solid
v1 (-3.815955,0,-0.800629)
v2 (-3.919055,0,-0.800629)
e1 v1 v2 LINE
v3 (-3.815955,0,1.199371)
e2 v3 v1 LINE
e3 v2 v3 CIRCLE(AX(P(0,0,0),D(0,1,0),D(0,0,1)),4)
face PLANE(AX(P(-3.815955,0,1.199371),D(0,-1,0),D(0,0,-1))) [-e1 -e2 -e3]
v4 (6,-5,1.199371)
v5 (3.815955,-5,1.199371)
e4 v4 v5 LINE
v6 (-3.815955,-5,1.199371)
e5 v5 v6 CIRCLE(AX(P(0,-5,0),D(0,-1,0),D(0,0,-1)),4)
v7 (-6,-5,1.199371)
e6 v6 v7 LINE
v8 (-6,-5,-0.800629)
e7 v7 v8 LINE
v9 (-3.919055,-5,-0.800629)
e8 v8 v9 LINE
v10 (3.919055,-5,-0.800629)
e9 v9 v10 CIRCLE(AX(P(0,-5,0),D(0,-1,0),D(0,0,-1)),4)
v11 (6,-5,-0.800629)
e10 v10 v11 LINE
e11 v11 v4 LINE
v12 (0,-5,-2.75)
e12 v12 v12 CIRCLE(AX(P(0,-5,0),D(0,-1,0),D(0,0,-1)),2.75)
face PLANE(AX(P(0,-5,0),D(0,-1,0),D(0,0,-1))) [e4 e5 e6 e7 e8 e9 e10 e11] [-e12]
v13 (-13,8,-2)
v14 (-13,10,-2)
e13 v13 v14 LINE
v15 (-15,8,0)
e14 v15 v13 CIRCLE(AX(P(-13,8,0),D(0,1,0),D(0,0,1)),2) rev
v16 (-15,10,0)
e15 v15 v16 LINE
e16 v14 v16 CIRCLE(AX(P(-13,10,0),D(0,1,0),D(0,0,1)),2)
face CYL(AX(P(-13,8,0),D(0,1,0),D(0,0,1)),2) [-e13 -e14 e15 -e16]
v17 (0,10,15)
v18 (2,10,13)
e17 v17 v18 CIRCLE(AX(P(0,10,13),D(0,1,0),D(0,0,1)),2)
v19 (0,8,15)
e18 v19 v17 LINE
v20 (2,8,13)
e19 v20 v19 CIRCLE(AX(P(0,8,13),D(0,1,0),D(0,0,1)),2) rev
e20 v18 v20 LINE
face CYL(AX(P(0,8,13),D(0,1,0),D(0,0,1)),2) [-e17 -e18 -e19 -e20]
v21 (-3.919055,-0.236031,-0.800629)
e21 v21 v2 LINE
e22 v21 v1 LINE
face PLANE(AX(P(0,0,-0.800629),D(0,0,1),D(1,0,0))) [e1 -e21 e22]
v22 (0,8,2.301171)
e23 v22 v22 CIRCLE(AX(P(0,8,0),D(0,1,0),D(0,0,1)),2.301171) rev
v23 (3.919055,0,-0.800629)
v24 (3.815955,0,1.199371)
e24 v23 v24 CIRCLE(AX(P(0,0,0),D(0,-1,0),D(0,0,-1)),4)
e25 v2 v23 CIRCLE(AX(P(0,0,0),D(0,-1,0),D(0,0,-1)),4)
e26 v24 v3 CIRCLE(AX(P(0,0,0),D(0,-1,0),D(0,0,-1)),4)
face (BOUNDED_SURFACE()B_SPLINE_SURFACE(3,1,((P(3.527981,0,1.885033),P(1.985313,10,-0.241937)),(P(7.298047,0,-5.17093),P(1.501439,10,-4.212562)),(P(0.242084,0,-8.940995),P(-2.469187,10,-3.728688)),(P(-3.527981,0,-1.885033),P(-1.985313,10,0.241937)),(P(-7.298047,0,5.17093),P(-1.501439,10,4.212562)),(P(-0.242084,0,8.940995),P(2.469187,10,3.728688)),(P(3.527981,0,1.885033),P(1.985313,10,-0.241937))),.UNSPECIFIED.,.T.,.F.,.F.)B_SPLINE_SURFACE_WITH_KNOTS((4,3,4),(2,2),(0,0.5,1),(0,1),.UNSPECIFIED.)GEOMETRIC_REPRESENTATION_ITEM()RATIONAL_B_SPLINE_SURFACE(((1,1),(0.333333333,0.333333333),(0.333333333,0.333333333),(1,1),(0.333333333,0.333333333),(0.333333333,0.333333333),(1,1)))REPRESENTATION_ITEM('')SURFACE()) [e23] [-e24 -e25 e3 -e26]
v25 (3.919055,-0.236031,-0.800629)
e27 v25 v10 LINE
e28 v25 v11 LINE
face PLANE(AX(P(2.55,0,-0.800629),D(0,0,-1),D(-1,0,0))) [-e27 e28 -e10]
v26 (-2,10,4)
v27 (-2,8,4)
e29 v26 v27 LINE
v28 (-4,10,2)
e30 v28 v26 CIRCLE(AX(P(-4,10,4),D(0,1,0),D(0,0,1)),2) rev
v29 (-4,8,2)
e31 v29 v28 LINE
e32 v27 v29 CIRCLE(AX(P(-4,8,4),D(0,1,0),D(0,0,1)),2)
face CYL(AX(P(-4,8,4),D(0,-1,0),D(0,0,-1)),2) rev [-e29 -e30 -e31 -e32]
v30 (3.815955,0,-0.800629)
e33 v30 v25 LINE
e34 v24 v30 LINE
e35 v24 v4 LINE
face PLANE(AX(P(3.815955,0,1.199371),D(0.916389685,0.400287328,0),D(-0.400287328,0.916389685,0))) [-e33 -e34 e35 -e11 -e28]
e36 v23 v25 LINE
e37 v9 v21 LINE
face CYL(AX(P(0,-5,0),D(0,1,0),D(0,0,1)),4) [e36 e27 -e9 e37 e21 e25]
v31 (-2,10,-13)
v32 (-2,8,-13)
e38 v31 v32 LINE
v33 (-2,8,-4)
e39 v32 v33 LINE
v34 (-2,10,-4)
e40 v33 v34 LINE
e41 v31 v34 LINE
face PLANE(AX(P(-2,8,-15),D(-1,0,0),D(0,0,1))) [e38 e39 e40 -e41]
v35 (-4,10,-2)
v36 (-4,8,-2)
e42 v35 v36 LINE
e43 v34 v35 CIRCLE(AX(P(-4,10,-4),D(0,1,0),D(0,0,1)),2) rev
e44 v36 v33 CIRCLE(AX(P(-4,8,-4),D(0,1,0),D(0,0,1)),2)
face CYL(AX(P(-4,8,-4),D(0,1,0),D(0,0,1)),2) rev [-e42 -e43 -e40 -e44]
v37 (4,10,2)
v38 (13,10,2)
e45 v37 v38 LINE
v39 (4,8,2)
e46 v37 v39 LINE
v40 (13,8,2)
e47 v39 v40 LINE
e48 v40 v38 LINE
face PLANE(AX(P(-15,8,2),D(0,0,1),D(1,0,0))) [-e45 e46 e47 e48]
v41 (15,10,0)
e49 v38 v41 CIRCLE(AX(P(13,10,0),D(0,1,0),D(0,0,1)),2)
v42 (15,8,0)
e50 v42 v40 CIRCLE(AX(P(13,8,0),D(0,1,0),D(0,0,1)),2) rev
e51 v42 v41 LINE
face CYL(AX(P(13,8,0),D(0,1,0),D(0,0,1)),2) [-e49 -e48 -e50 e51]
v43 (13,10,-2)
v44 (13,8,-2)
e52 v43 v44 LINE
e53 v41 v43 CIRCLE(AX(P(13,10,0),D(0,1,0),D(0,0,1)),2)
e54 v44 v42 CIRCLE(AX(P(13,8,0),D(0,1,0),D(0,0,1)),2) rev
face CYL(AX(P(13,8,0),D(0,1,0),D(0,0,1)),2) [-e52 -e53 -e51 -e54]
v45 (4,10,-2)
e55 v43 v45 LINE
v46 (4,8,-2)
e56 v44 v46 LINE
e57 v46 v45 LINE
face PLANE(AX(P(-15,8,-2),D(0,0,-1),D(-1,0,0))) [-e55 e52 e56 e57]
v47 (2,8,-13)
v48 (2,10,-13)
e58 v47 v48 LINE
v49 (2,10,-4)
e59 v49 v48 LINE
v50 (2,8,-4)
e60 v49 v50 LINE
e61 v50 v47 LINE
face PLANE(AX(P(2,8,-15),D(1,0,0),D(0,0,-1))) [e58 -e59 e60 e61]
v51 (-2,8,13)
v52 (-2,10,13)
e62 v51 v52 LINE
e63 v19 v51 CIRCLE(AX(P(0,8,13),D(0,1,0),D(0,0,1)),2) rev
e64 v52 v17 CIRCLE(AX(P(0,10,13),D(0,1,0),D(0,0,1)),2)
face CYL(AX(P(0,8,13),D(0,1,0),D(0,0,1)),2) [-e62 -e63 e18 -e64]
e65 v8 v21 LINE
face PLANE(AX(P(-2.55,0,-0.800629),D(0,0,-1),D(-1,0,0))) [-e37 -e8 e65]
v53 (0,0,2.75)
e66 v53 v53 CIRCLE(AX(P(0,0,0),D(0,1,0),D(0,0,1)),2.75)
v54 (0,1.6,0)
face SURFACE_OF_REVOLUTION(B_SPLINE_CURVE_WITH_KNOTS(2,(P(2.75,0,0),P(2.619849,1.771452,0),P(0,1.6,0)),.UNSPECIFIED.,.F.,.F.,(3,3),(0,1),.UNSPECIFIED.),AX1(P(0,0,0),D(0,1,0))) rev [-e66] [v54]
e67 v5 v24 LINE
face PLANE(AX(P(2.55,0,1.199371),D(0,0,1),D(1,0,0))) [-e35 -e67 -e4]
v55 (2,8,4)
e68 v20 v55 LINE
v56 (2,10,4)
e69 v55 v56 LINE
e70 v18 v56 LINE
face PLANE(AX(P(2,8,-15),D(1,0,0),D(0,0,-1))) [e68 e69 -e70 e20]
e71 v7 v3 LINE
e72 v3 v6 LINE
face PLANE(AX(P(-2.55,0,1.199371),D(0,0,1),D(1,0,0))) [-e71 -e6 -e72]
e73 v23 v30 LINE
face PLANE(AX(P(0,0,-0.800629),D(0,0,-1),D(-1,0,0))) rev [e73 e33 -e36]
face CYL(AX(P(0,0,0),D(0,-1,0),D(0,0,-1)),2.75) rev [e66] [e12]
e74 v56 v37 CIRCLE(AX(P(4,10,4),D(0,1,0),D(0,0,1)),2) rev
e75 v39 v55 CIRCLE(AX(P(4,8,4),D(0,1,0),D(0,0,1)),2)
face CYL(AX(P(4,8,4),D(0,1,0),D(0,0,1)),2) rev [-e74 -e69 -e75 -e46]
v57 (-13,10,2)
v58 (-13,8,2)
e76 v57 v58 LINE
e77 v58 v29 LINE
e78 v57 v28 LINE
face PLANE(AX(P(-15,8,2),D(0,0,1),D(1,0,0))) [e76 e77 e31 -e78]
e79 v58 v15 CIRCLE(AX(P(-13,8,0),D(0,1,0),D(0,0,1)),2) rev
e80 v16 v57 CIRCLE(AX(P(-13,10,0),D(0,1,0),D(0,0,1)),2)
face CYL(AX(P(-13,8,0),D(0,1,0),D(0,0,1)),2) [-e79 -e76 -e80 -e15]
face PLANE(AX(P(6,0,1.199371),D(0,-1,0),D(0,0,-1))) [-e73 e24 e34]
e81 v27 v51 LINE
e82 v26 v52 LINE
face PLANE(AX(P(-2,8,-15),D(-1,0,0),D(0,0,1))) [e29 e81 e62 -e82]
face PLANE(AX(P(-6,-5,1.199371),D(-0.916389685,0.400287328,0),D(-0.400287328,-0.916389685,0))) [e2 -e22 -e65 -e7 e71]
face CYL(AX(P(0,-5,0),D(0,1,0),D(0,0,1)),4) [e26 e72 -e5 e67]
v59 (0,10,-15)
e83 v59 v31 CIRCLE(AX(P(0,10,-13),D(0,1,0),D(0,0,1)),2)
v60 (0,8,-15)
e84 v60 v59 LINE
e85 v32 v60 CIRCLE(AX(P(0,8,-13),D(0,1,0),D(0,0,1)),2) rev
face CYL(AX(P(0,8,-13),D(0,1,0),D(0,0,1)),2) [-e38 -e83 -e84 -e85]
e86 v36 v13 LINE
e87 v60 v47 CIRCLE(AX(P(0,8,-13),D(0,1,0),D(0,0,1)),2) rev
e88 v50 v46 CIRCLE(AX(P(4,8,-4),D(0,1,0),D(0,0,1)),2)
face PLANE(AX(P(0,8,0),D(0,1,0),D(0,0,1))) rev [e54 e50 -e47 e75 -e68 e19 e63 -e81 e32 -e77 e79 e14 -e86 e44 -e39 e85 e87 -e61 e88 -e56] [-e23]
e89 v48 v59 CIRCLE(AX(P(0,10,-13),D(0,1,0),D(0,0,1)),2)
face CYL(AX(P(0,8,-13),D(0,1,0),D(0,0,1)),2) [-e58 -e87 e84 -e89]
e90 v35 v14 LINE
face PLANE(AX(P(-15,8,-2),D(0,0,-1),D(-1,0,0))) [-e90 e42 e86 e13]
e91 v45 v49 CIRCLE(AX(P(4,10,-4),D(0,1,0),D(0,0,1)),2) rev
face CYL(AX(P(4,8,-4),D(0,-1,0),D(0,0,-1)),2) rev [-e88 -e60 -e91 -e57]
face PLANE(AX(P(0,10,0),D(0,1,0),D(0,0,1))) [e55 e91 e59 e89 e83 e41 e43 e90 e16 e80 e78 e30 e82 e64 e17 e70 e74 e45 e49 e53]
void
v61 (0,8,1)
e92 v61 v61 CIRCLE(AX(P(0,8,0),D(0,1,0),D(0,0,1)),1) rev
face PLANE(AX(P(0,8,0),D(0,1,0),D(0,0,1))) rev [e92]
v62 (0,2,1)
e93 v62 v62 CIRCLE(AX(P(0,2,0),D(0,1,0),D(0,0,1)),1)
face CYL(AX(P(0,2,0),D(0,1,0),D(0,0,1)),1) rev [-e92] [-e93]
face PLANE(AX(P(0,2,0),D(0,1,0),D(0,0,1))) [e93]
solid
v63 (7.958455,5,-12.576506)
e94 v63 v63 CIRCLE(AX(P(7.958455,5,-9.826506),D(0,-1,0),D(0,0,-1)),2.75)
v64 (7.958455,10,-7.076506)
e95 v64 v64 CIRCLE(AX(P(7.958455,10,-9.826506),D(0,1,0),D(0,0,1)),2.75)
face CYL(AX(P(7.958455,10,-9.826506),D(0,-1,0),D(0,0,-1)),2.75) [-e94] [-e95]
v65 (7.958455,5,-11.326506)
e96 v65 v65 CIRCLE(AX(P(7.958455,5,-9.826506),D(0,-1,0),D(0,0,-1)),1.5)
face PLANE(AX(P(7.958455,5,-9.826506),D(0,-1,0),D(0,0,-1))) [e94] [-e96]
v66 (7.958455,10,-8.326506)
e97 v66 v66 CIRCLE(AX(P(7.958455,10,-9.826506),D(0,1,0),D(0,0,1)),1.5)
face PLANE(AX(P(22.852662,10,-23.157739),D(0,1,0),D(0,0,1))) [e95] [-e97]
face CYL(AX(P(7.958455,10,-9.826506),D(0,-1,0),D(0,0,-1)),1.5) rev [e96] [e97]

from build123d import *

# Parameters (mm, degrees)
SKETCH_1_R          = 2
EXTRUDE_2_DEPTH     = 10
SKETCH_4_R          = 1
CUT_EXTRUDE_1_DEPTH = 1.5
SKETCH_5_R          = 2.5500000000000007
CUT_EXTRUDE_2_DEPTH = 1.5
OTHER_4_OUTLINE_R   = 2.55
OTHER_4_DEPTH       = 1.5
SKETCH_9_R          = 4
SKETCH_9_R_2        = 2.5500000000000003
EXTRUDE_3_DEPTH     = 5
SKETCH_11_W         = 3.45
SKETCH_11_H         = 2
EXTRUDE_4_DEPTH     = 5
SKETCH_13_R         = 2.5499999999999994
SKETCH_13_R_2       = 1.3600000000000005
EXTRUDE_6_DEPTH     = 5
SKETCH_14_R         = 2.75
CUT_EXTRUDE_3_DEPTH = 5
SKETCH_17_R         = 1
CUT_EXTRUDE_4_DEPTH = 8
SKETCH_18_R         = 1.5000000000000004
CUT_EXTRUDE_5_DEPTH = 8
SKETCH_19_R         = 2.7499999999999982
SKETCH_19_R_2       = 2.549999999999999
EXTRUDE_7_DEPTH     = 5
SWEEP_4_DEPTH       = 1.199370755
EXTRUDE_8_DEPTH     = 2
SKETCH_26_W         = 30
SKETCH_26_H         = 4
EXTRUDE_9_DEPTH     = 2
FILLET_3_R          = 2
FILLET_4_R          = 2
SKETCH_28_R         = 2.7499999999999982
SKETCH_28_R_2       = 1.5000000000000002
EXTRUDE_10_DEPTH    = 10
SKETCH_29_R         = 2.749999999999998
SKETCH_29_R_2       = 1.5000000000000002
CUT_EXTRUDE_6_DEPTH = 5
SKETCH_30_R         = 3.4440131177468327
CUT_EXTRUDE_7_DEPTH = 5
FILLET_5_R          = 2
SKETCH_31_R         = 32.078168180335766
EXTRUDE_11_DEPTH    = 5
CUT_EXTRUDE_START   = -5
SKETCH_32_R         = 32.078168180335766
CUT_EXTRUDE_8_DEPTH = 5


with BuildPart() as part:
    # 草图1 → 凸台-拉伸2 (new body)
    with BuildSketch(Plane(origin=(0, 0, 0), x_dir=(1, 0, 0), z_dir=(0, 1, 0))):
        with Locations(Location((0, 0, 0), (0, 0, 270))):
            Circle(SKETCH_1_R)
    extrude(amount=EXTRUDE_2_DEPTH)

    # 放样1: read off the stored shape, not the designer's step
    # 放样1: loft between two sections, ruled curve by curve
    loft_1_from = [
        Edge.make_bspline([(3.527981201, 0, 1.885032797), (7.298046794, 0, -5.170929606), (0.242084392, 0, -8.940995199), (-3.527981201, 0, -1.885032797), (-7.298046794, 0, 5.170929606), (-0.242084392, 0, 8.940995199), (3.527981201, 0, 1.885032797)], [0, 0, 0, 0, 0.5, 0.5, 0.5, 1, 1, 1, 1], 3, [1, 0.333333333333333, 0.333333333333333, 1, 0.333333333333333, 0.333333333333333, 1]),
    ]
    loft_1_to = [
        Edge.make_bspline([(1.985312696, 10, -0.241936974), (1.501438748, 10, -4.212562366), (-2.469186644, 10, -3.728688418), (-1.985312696, 10, 0.241936974), (-1.501438748, 10, 4.212562366), (2.469186644, 10, 3.728688418), (1.985312696, 10, -0.241936974)], [0, 0, 0, 0, 0.5, 0.5, 0.5, 1, 1, 1, 1], 3, [1, 0.333333333333333, 0.333333333333333, 1, 0.333333333333333, 0.333333333333333, 1]),
    ]
    loft_1 = Solid(Shell([*[Face.make_surface_from_curves(loft_1_from[k], loft_1_to[k]) for k in range(1)], Face(Wire(loft_1_from)), Face(Wire(loft_1_to))]))
    add(loft_1)

    # 草图4 → 切除-拉伸1 (cut)
    with BuildSketch(Plane.XZ):
        with Locations(Location((0, 0, 0), (0, 0, 270))):
            Circle(SKETCH_4_R)
    extrude(amount=-CUT_EXTRUDE_1_DEPTH, mode=Mode.SUBTRACT)

    # 草图5 → 切除-拉伸2 (cut)
    with BuildSketch(Plane.XZ):
        with Locations(Location((0, 0, 0), (0, 0, 270))):
            Circle(SKETCH_5_R)
    extrude(amount=-CUT_EXTRUDE_2_DEPTH, mode=Mode.SUBTRACT)

    # 边界4: read off the stored shape, not the designer's step
    # 边界4 outline → 边界4 (add)
    with BuildSketch(Plane(origin=(0, 0, 0), x_dir=(1, 0, 0), z_dir=(0, 1, 0))):
        Circle(OTHER_4_OUTLINE_R)
    extrude(amount=OTHER_4_DEPTH)

    # 切除-扫描1: sweep along a path in 草图7
    with BuildLine(Plane.XZ) as sweep_1_path:
        CenterArc((0, 0), 2.5500000000000003, 0, 360)
    # 草图8 → 切除-扫描1 (sweep, cut)
    with BuildSketch(Plane.XY):
        with BuildLine():
            Line((0, 1.5), (0, 0))
            Line((0, 0), (2.55, 0))
            add(Edge.make_bspline(
                [(2.55, 0), (2.066182344596684, 1.6092270378331606), (0, 1.5)],
                knots=[0, 0, 0, 1, 1, 1], degree=2))
        make_face()
    sweep(path=sweep_1_path.line, mode=Mode.SUBTRACT)

    # 草图9 → 凸台-拉伸3 (add)
    with BuildSketch(Plane.XZ):
        with Locations(Location((0, 0, 0), (0, 0, 28.116))):
            Circle(SKETCH_9_R)
        with Locations(Location((0, 0, 0), (0, 0, 90))):
            Circle(SKETCH_9_R_2, mode=Mode.SUBTRACT)
    extrude(amount=EXTRUDE_3_DEPTH)

    # 草图11 → 凸台-拉伸4 (add)
    with BuildSketch(Plane.XZ.offset(5)):
        Polygon((2.55, 1.199370755069412), (2.5500000000000003, -0.8006292449305884), (6, -0.8006292449305882), (6, 1.199370755069412), align=None)
        with Locations((-4.275, 0.19937075506941165)):
            Rectangle(SKETCH_11_W, SKETCH_11_H)
    extrude(amount=-EXTRUDE_4_DEPTH)

    # 草图14 → 切除-拉伸3 (cut)
    with BuildSketch(Plane.XZ.offset(5)):
        with Locations(Location((0, 0, 0), (0, 0, 270))):
            Circle(SKETCH_14_R)
    extrude(amount=-CUT_EXTRUDE_3_DEPTH, mode=Mode.SUBTRACT)

    # 切除-扫描2: sweep along a path in 草图16
    with BuildLine(Plane.XZ) as sweep_2_path:
        CenterArc((0, 0), 2.75, 0, 360)
    # 草图15 → 切除-扫描2 (sweep, cut)
    with BuildSketch(Plane.XY):
        with BuildLine():
            Line((0, 0), (2.75, 0))
            add(Edge.make_bspline(
                [(2.75, 0), (2.6198492058143814, 1.7714522282796645), (0, 1.6)],
                knots=[0, 0, 0, 1, 1, 1], degree=2))
            Line((0, 1.6), (0, 0))
        make_face()
    sweep(path=sweep_2_path.line, mode=Mode.SUBTRACT)

    # 草图17 → 切除-拉伸4 (cut)
    with BuildSketch(Plane(origin=(0, 10, 0), x_dir=(1, 0, 0), z_dir=(0, 1, 0))):
        with Locations(Location((0, 0, 0), (0, 0, 270))):
            Circle(SKETCH_17_R)
    extrude(amount=-CUT_EXTRUDE_4_DEPTH, mode=Mode.SUBTRACT)

    # 切除-扫描4: read off the stored shape, not the designer's step
    # 切除-扫描4 outline → 切除-扫描4 (cut)
    with BuildSketch(Plane.XY):
        Polygon((6, 0), (3.815954637, 0), (6, -5), align=None)
        Polygon((-3.815954637, 0), (-6, 0), (-6, -5), align=None)
    extrude(amount=SWEEP_4_DEPTH, mode=Mode.SUBTRACT)

    # 切除-扫描5: sweep along a path in 草图24
    with BuildLine(Plane(origin=(6, 0, 0), x_dir=(0, 0, -1), z_dir=(1, 0, 0))) as sweep_5_path:
        Line((0, -5), (0.8006292449305882, -5))
    # 草图23 → 切除-扫描5 (sweep, cut)
    with BuildSketch(Plane.XY):
        Polygon((3.8159546370317634, 0), (6, 0), (6, -5), align=None)
        Polygon((-3.8159546370317634, 0), (-6, -5), (-6, 0), align=None)
    sweep(path=sweep_5_path.line, mode=Mode.SUBTRACT)

    # 草图25 → 凸台-拉伸8 (add)
    with BuildSketch(Plane(origin=(0, 10, 0), x_dir=(1, 0, 0), z_dir=(0, 1, 0))):
        Polygon((-2.0000000000000027, 15.000000000000004), (1.9999999999999973, 15.000000000000004), (2.000000000000001, -14.999999999999996), (-1.9999999999999991, -14.999999999999996), align=None)
    extrude(amount=-EXTRUDE_8_DEPTH)

    # 草图26 → 凸台-拉伸9 (add)
    with BuildSketch(Plane(origin=(0, 10, 0), x_dir=(1, 0, 0), z_dir=(0, 1, 0))):
        Rectangle(SKETCH_26_W, SKETCH_26_H)
    extrude(amount=-EXTRUDE_9_DEPTH)

    # 圆角3
    fillet_3_edges = [part.edges().sort_by_distance(p)[0] for p in [
        (-2.000000000000001, 9, 2),
    ]]
    fillet(fillet_3_edges, radius=FILLET_3_R)

    # 圆角4
    fillet_4_edges = [part.edges().sort_by_distance(p)[0] for p in [
        (1.9999999999999987, 9, 2),
        (-2.0000000000000018, 9, -1.9999999999999998),
        (1.9999999999999987, 9, -1.9999999999999998),
    ]]
    fillet(fillet_4_edges, radius=FILLET_4_R)

    # 圆角5
    fillet_5_edges = [part.edges().sort_by_distance(p)[0] for p in [
        (1.9999999999999973, 9, -15.000000000000004),
        (-2.0000000000000027, 9, -15.000000000000004),
        (-14.999999999999998, 9, -1.9999999999999996),
        (-14.999999999999998, 9, 2.0000000000000004),
        (-1.9999999999999991, 9, 14.999999999999996),
        (2.000000000000001, 9, 14.999999999999996),
        (15.000000000000002, 9, 2.0000000000000004),
        (15.000000000000002, 9, -1.9999999999999996),
    ]]
    fillet(fillet_5_edges, radius=FILLET_5_R - 0.0001)  # a hair under: the kernel refuses the full size



with BuildPart() as body_2:
    # 草图13 → 凸台-拉伸6 (new body)
    with BuildSketch(Plane.XZ.offset(5)):
        with Locations(Location((13.780391227088217, 0, 0), (0, 0, 270))):
            Circle(SKETCH_13_R)
        with Locations(Location((13.780391227088217, 0, 0), (0, 0, 270))):
            Circle(SKETCH_13_R_2, mode=Mode.SUBTRACT)
    extrude(amount=-EXTRUDE_6_DEPTH)

    # 草图18 → 切除-拉伸5 (cut)
    with BuildSketch(Plane.XZ.offset(5)):
        with Locations(Location((13.780391227088217, 0, 0), (0, 0, 270))):
            Circle(SKETCH_18_R)
    extrude(amount=-CUT_EXTRUDE_5_DEPTH, mode=Mode.SUBTRACT)

    # 草图19 → 凸台-拉伸7 (add)
    with BuildSketch(Plane.XZ.offset(5)):
        with Locations(Location((13.780391227088217, 0, 0), (0, 0, 270))):
            Circle(SKETCH_19_R)
        with Locations((13.780391227088217, 0)):
            Circle(SKETCH_19_R_2, mode=Mode.SUBTRACT)
    extrude(amount=-EXTRUDE_7_DEPTH)

    # 草图30 → 切除-拉伸7 (cut)
    with BuildSketch(Plane.XZ.offset(5)):
        with Locations((13.780391227088217, 0)):
            Circle(SKETCH_30_R)
    extrude(amount=-CUT_EXTRUDE_7_DEPTH, mode=Mode.SUBTRACT)


with BuildPart() as body_3:
    # 草图28 → 凸台-拉伸10 (new body)
    with BuildSketch(Plane(origin=(0, 0, 0), x_dir=(1, 0, 0), z_dir=(0, 1, 0))):
        with Locations(Location((7.958455223865325, 9.826506431956656, 0), (0, 0, 270))):
            Circle(SKETCH_28_R)
        with Locations(Location((7.958455223865325, 9.826506431956656, 0), (0, 0, 270))):
            Circle(SKETCH_28_R_2, mode=Mode.SUBTRACT)
    extrude(amount=EXTRUDE_10_DEPTH)

    # 草图29 → 切除-拉伸6 (cut)
    with BuildSketch(Plane.XZ):
        with Locations(Location((7.958455223865325, -9.826506431956656, 0), (0, 0, 270))):
            Circle(SKETCH_29_R)
        with Locations(Location((7.958455223865325, -9.826506431956656, 0), (0, 0, 270))):
            Circle(SKETCH_29_R_2, mode=Mode.SUBTRACT)
    extrude(amount=-CUT_EXTRUDE_6_DEPTH, mode=Mode.SUBTRACT)


with BuildPart() as part_1:
    add(part.part)

    add(body_3.part)  # 凸台-拉伸11 merges body 3
    # 草图31 → 凸台-拉伸11 (add)
    with BuildSketch(Plane(origin=(0, 10, 0), x_dir=(1, 0, 0), z_dir=(0, 1, 0))):
        with Locations(Location((22.852661554417406, 23.157739017835205, 0), (0, 0, 218.644756535))):
            Circle(SKETCH_31_R)
    extrude(amount=EXTRUDE_11_DEPTH)

    # 草图32 → 切除-拉伸8 (cut)
    with BuildSketch(Plane(origin=(0, 15, 0), x_dir=(1, 0, 0), z_dir=(0, 1, 0)).offset(CUT_EXTRUDE_START)):
        with Locations((22.852661554417406, 23.157739017835205)):
            Circle(SKETCH_32_R)
    extrude(amount=CUT_EXTRUDE_8_DEPTH, mode=Mode.SUBTRACT)


with BuildPart() as cut_extrude_8_piece_1:
    # of the separate pieces the step leaves, piece 1, a body of its own (cut_extrude_8_pieces)
    add(part_1.part.solids().sort_by_distance((2, 8, 13.0001))[0])


with BuildPart() as cut_extrude_8_piece_2:
    # of the separate pieces the step leaves, piece 2, a body of its own (cut_extrude_8_pieces)
    add(part_1.part.solids().sort_by_distance((7.958455224, 5, -7.076506432))[0])


solid = Compound([cut_extrude_8_piece_1.part, cut_extrude_8_piece_2.part])
